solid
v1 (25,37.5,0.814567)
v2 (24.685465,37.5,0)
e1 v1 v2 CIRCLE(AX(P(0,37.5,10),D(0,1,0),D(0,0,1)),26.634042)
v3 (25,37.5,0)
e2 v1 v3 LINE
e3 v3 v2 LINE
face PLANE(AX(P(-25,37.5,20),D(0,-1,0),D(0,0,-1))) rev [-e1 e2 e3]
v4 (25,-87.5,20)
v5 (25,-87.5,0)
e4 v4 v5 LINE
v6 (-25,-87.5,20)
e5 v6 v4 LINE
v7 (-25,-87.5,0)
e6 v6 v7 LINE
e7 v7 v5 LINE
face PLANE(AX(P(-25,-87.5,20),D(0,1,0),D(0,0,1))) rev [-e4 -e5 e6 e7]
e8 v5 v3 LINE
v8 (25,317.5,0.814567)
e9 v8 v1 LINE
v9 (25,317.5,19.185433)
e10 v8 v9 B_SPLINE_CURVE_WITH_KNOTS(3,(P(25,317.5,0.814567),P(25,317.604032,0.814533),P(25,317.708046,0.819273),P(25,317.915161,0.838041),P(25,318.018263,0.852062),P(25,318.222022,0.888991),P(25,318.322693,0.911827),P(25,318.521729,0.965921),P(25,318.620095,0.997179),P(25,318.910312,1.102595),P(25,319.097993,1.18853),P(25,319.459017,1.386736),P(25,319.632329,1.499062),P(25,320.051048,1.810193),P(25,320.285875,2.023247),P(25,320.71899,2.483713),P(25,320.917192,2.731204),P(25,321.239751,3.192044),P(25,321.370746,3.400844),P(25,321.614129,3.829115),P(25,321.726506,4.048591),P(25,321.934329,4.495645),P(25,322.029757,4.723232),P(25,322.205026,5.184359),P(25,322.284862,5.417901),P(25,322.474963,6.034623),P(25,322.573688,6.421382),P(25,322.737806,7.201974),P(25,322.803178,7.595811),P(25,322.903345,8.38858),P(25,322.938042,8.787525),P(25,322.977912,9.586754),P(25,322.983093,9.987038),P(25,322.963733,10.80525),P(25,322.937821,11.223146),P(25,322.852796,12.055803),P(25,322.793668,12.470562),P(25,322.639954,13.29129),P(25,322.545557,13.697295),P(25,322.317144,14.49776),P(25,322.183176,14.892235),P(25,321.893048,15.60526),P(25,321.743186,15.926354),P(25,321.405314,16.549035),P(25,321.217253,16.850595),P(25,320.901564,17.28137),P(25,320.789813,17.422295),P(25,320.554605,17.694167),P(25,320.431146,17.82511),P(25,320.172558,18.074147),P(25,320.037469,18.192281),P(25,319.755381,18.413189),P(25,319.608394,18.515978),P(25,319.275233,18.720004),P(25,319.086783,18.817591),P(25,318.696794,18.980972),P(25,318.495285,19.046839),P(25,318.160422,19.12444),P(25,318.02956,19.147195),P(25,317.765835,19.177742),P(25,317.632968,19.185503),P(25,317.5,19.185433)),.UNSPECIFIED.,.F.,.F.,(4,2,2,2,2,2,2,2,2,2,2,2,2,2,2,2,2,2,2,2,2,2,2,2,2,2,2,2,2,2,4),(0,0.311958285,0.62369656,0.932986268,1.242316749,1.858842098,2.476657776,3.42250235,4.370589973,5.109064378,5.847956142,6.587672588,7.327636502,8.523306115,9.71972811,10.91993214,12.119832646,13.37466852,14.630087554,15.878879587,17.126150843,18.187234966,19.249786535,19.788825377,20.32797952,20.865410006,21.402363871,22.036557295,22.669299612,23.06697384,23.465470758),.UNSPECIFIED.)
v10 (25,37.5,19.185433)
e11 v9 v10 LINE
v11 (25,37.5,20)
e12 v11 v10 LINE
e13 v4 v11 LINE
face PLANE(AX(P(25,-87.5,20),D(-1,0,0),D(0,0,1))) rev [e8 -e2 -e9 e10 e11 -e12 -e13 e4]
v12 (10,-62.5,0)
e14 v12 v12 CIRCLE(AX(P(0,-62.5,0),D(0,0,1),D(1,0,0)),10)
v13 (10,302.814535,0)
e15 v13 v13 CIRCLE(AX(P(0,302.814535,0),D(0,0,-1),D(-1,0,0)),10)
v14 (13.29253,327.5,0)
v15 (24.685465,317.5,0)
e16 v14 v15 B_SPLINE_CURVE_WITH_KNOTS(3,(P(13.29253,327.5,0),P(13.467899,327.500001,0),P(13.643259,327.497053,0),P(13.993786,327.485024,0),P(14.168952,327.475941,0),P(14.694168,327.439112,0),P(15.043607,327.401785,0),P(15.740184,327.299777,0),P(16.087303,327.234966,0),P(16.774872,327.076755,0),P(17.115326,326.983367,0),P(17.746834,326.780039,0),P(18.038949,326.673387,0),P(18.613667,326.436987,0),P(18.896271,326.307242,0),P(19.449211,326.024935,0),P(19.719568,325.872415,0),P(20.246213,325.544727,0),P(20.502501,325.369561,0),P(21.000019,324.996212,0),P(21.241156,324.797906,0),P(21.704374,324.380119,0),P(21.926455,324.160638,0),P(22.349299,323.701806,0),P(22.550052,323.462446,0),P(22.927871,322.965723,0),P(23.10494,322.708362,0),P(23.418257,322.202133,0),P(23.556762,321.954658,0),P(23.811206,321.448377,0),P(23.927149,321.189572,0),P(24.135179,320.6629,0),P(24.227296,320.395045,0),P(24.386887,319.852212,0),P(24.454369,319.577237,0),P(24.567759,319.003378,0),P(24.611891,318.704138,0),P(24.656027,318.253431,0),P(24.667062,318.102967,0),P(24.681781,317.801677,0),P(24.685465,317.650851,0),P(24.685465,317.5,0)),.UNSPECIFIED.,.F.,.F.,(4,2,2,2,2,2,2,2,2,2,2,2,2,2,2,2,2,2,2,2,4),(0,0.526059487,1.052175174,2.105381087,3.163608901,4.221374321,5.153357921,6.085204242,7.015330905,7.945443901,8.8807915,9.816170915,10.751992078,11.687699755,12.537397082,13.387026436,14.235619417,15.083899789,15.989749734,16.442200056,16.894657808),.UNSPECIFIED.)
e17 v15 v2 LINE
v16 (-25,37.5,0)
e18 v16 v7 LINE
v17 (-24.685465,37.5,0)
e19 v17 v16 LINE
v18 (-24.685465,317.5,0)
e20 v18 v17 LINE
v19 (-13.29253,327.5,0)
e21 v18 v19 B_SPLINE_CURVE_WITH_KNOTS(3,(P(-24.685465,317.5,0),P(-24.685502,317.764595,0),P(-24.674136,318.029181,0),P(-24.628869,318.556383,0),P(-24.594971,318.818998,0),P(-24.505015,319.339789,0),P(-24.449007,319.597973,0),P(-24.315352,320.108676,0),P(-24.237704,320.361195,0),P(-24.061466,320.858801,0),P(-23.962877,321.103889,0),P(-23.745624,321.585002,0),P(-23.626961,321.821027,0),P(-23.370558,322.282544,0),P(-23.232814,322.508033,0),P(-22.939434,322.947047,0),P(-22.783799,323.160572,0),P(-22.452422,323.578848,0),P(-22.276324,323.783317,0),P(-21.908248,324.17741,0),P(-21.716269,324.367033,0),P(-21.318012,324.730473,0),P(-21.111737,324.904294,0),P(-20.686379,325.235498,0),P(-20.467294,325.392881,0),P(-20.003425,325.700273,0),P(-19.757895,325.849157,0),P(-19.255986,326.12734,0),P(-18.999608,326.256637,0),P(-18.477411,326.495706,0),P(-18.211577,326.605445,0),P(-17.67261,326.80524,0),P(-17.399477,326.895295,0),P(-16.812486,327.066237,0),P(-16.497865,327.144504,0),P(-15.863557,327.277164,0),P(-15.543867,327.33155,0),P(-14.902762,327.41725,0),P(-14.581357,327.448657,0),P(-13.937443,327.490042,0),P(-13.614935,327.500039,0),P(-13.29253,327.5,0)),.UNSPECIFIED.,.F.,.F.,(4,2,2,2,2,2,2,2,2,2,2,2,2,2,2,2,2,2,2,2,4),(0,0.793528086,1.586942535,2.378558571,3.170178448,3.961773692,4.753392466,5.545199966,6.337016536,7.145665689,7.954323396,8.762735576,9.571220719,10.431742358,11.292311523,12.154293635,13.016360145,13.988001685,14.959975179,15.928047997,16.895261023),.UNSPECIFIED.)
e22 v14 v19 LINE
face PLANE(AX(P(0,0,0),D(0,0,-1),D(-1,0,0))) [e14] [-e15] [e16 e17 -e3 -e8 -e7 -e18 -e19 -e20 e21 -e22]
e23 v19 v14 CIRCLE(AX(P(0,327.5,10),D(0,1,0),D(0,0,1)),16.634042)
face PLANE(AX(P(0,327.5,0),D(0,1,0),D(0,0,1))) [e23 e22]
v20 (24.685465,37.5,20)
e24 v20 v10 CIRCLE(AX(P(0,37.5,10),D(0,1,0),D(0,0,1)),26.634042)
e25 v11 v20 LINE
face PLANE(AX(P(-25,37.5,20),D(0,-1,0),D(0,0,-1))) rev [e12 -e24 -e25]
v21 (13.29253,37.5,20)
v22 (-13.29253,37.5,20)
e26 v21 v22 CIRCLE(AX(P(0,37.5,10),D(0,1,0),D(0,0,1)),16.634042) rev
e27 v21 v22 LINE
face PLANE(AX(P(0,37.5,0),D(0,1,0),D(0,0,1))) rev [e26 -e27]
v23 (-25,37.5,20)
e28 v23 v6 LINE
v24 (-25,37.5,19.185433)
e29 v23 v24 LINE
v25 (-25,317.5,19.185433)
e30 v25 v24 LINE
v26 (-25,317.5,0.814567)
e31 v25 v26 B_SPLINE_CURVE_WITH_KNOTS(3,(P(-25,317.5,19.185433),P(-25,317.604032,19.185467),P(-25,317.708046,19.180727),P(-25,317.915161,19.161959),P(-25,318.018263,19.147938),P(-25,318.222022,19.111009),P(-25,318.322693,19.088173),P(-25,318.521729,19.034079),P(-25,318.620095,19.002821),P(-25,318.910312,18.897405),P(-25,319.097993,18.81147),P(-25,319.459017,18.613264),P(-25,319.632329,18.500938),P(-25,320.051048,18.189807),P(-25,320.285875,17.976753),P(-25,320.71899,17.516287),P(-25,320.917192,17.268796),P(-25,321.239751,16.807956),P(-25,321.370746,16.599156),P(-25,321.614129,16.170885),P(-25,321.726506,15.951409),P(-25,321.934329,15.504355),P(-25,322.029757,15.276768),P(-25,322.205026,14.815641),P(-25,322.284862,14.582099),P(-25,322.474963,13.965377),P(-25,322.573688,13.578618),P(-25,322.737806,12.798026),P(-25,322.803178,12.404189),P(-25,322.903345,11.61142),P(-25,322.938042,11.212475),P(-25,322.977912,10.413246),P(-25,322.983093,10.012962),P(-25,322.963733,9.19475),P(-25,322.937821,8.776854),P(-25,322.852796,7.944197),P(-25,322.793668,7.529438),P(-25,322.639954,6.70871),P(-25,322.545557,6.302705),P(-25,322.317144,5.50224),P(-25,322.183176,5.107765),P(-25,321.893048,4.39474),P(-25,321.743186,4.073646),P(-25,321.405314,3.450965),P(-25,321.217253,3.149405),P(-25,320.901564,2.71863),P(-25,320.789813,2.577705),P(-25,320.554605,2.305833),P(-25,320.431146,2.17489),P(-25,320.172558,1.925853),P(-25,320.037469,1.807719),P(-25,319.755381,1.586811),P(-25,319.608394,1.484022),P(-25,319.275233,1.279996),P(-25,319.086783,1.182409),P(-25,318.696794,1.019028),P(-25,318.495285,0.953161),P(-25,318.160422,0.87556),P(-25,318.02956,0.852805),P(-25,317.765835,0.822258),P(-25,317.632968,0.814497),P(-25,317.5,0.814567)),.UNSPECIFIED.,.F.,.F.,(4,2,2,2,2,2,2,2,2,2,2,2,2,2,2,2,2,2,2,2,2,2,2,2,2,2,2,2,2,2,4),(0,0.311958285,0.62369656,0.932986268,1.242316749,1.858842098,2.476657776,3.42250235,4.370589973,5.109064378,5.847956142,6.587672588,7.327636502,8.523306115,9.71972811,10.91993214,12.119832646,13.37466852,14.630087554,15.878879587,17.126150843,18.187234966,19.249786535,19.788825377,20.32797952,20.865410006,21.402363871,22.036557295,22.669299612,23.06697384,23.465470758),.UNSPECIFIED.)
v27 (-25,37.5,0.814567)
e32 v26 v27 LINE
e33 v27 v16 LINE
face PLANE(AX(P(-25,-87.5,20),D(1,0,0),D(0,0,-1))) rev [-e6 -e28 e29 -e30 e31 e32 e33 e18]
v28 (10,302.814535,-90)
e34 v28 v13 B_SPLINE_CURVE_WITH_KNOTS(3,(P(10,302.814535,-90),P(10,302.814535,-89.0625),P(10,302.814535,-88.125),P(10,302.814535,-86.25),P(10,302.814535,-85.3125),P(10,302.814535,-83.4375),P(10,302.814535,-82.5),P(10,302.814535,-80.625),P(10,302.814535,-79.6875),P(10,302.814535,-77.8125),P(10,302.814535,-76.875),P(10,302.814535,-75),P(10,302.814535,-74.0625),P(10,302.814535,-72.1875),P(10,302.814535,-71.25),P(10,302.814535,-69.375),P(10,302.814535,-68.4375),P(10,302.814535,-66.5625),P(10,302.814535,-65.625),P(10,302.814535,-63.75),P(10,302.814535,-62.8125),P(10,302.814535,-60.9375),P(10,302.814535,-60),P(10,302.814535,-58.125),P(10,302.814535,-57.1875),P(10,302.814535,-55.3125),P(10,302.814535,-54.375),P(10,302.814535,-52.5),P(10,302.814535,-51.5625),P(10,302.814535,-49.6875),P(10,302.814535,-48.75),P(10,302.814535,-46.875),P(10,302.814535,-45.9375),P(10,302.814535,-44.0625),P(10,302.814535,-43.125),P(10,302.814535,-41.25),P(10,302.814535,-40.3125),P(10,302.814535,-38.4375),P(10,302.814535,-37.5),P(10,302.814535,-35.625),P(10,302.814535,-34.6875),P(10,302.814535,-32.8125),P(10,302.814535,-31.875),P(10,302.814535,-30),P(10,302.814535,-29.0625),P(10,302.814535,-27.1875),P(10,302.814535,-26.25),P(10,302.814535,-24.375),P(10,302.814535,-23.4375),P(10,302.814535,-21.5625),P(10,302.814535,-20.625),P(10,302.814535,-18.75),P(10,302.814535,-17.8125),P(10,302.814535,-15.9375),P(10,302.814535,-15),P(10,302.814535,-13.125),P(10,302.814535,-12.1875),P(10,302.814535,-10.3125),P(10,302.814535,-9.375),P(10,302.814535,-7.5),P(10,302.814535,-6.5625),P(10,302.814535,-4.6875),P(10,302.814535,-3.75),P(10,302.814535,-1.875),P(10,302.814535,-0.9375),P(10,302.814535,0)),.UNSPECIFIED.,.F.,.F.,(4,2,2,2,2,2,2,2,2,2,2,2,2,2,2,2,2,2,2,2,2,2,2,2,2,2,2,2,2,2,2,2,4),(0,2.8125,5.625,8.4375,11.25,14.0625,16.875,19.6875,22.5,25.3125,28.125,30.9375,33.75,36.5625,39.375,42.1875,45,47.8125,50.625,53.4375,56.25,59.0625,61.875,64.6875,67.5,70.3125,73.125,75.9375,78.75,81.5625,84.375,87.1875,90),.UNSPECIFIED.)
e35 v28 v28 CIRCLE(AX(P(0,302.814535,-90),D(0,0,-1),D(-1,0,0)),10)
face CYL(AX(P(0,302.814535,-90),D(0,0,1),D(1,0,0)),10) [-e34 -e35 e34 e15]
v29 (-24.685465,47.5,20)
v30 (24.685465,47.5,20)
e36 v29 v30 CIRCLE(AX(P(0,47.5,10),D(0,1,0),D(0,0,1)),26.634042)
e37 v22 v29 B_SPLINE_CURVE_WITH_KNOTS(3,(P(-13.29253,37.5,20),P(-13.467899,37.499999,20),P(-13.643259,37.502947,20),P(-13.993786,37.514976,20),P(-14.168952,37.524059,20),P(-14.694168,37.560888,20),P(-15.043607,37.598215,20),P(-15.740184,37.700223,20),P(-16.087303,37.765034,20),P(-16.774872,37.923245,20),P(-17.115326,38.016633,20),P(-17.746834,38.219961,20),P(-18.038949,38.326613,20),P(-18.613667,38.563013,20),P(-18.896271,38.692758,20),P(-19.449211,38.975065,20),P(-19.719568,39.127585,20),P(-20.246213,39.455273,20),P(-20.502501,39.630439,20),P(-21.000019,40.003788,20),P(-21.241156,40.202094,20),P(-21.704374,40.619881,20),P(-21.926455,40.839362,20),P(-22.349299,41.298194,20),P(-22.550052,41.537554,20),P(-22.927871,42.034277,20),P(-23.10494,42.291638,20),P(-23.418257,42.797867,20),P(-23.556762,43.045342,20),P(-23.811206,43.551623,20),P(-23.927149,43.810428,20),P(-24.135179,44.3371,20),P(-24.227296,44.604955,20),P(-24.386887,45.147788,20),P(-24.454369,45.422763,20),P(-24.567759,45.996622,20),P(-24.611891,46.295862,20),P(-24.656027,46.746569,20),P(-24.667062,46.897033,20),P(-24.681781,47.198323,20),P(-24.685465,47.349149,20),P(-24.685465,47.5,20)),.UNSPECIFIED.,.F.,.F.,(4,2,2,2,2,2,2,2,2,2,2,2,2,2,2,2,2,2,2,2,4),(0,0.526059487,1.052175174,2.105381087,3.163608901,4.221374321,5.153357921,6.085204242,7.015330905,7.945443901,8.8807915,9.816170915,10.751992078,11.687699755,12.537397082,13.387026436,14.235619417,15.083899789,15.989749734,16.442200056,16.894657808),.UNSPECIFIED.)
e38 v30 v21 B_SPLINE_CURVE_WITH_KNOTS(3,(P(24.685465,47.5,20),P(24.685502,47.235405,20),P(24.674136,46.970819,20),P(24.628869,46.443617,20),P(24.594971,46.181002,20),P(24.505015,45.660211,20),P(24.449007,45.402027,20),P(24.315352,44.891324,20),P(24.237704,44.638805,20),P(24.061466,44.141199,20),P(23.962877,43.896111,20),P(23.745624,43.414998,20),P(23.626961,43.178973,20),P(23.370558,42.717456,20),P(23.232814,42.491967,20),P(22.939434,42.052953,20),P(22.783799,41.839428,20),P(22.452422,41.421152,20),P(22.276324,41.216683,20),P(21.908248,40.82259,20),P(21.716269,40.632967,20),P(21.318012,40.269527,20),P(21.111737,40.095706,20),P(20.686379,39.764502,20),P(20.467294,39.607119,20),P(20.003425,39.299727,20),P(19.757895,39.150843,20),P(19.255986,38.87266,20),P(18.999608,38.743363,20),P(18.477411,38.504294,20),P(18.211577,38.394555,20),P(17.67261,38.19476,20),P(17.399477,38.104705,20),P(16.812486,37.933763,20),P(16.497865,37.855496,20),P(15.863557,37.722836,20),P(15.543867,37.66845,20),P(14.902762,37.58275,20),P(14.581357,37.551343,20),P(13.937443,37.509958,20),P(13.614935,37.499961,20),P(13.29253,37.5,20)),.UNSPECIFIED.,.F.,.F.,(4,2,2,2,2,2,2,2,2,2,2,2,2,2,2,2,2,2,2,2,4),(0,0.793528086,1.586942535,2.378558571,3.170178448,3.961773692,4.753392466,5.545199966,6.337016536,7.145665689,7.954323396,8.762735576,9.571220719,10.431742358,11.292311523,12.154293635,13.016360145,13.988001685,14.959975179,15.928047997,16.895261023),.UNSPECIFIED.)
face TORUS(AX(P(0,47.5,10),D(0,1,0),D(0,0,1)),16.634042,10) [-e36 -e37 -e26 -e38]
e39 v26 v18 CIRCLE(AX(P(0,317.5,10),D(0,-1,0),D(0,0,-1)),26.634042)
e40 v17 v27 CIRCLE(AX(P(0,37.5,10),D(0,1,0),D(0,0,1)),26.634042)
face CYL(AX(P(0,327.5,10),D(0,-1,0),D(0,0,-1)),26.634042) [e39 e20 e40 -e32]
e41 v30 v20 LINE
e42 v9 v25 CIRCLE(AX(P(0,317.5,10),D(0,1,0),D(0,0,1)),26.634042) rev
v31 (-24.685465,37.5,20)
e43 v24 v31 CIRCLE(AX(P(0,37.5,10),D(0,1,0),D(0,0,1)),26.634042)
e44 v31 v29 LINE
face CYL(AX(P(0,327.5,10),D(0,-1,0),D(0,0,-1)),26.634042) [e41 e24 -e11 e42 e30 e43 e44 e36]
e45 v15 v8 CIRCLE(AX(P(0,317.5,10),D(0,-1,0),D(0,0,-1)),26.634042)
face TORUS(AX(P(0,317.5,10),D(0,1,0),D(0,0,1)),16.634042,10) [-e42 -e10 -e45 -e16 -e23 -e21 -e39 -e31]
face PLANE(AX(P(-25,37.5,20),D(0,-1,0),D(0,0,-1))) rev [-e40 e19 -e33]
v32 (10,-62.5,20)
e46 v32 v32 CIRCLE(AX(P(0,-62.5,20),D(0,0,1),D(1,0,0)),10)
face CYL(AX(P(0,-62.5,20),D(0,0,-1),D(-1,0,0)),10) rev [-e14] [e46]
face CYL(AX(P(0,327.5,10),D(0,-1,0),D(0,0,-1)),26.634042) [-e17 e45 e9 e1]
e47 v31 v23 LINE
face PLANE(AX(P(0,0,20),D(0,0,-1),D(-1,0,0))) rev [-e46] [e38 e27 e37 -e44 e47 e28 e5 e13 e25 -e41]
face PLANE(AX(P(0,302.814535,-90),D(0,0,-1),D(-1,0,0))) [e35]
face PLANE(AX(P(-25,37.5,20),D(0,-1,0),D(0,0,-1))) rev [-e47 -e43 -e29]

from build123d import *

# Parameters (mm, degrees)
ESQUISSE1_W        = 50
ESQUISSE1_H        = 125
ESQUISSE1_R        = 10
BOSS_EXTRU_1_DEPTH = 20
BOSS_EXTRU_2_DEPTH = 290
ESQUISSE4_R        = 10
BOSS_EXTRU_3_DEPTH = 90
CONG_1_R           = 10


with BuildPart() as part:
    # Esquisse1 → Boss.-Extru.1 (new body)
    with BuildSketch(Plane.XY):
        with Locations((0, -25)):
            Rectangle(ESQUISSE1_W, ESQUISSE1_H)
        with Locations((0, -62.5)):
            Circle(ESQUISSE1_R, mode=Mode.SUBTRACT)
    extrude(amount=BOSS_EXTRU_1_DEPTH)

    # Esquisse2 → Boss.-Extru.2 (add)
    with BuildSketch(Plane(origin=(0, 37.5, 0), x_dir=(1, 0, 0), z_dir=(0, 1, 0))):
        with BuildLine():
            ThreePointArc((25, -0.81456696), (24.846070853, -0.405994408), (24.685464957, 0))
            Line((24.685464957, 0), (-24.685464957, 0))
            ThreePointArc((-24.685464957, 0), (-24.846070853, -0.405994408), (-25, -0.81456696))
            Line((-25, -0.81456696), (-25, -19.18543304))
            ThreePointArc((-25, -19.18543304), (0, -36.634041753), (25, -19.18543304))
            Line((25, -19.18543304), (25, -0.81456696))
        make_face()
    extrude(amount=BOSS_EXTRU_2_DEPTH)

    # Esquisse4 → Boss.-Extru.3 (add)
    with BuildSketch(Plane(origin=(0, 0, 0), x_dir=(-1, 0, 0), z_dir=(0, 0, -1))):
        with Locations(Location((0, 302.814535043, 0), (0, 0, 180))):
            Circle(ESQUISSE4_R)
    extrude(amount=BOSS_EXTRU_3_DEPTH)

    # Congé1
    # the kernel refuses this fillet: 10 mm, written as the material it takes off along each edge
    with BuildSketch(Plane(origin=(0, 37.5, 10), x_dir=(-0.8501027120778188, 0, -0.5266169185640897), z_dir=(0.5266169185640897, 0, -0.8501027120778188))) as cong_1_piece_1_section:
        with BuildLine():
            CenterArc((26.634041753 - CONG_1_R, CONG_1_R), CONG_1_R, 270, 90)
            Line((26.634041753 - CONG_1_R, 0), (26.634041753, 0))
            Line((26.634041753, 0), (26.634041753, CONG_1_R))
        make_face()
    cong_1_piece_1 = revolve(axis=Axis((0, 37.5, 10), (0, 1, 0)), revolution_arc=243.554314658, mode=Mode.PRIVATE)
    cong_1_piece_1 = split(cong_1_piece_1, bisect_by=Plane(origin=(0, 40.353738925, 20), z_dir=(0, 0, 1)), keep=Keep.TOP, mode=Mode.PRIVATE)
    add(cong_1_piece_1, mode=Mode.SUBTRACT)
    with BuildSketch(Plane(origin=(0, 327.5, 10), x_dir=(-0.8323565470530717, 0, -0.5542405421636779), z_dir=(0.5542405421636779, 0, -0.8323565470530717))) as cong_1_piece_2:
        with BuildLine():
            CenterArc((26.634041753 - CONG_1_R, -CONG_1_R), CONG_1_R, 0, 90)
            Line((26.634041753, -CONG_1_R), (26.634041753, 0))
            Line((26.634041753, 0), (26.634041753 - CONG_1_R, 0))
        make_face()
    revolve(axis=Axis((0, 327.5, 10), (0, 1, 0)), revolution_arc=247.316842265, mode=Mode.SUBTRACT)
    with BuildSketch(Plane(origin=(0, 327.5, 10), x_dir=(0.8328594865150245, 0, 0.5534844855295674), z_dir=(-0.5534844855295674, 0, 0.8328594865150245))) as cong_1_piece_3:
        with BuildLine():
            CenterArc((26.634041753 - CONG_1_R, -CONG_1_R), CONG_1_R, 0, 90)
            Line((26.634041753, -CONG_1_R), (26.634041753, 0))
            Line((26.634041753, 0), (26.634041753 - CONG_1_R, 0))
        make_face()
    revolve(axis=Axis((0, 327.5, 10), (0, 1, 0)), revolution_arc=109.439699246, mode=Mode.SUBTRACT)
    with BuildSketch(Plane(origin=(0, 327.5, 10), x_dir=(-0.2447438061673637, 0, -0.9695877832061993), z_dir=(0.9695877832061993, 0, -0.2447438061673637))) as cong_1_piece_4:
        with BuildLine():
            CenterArc((26.634041753 - CONG_1_R, -CONG_1_R), CONG_1_R, 0, 90)
            Line((26.634041753 - CONG_1_R, 0), (26.634041753, 0))
            Line((26.634041753, 0), (26.634041753, -CONG_1_R))
        make_face()
    revolve(axis=Axis((0, 327.5, 10), (0, 1, 0)), revolution_arc=109.439699247, mode=Mode.SUBTRACT)


solid = part.part
